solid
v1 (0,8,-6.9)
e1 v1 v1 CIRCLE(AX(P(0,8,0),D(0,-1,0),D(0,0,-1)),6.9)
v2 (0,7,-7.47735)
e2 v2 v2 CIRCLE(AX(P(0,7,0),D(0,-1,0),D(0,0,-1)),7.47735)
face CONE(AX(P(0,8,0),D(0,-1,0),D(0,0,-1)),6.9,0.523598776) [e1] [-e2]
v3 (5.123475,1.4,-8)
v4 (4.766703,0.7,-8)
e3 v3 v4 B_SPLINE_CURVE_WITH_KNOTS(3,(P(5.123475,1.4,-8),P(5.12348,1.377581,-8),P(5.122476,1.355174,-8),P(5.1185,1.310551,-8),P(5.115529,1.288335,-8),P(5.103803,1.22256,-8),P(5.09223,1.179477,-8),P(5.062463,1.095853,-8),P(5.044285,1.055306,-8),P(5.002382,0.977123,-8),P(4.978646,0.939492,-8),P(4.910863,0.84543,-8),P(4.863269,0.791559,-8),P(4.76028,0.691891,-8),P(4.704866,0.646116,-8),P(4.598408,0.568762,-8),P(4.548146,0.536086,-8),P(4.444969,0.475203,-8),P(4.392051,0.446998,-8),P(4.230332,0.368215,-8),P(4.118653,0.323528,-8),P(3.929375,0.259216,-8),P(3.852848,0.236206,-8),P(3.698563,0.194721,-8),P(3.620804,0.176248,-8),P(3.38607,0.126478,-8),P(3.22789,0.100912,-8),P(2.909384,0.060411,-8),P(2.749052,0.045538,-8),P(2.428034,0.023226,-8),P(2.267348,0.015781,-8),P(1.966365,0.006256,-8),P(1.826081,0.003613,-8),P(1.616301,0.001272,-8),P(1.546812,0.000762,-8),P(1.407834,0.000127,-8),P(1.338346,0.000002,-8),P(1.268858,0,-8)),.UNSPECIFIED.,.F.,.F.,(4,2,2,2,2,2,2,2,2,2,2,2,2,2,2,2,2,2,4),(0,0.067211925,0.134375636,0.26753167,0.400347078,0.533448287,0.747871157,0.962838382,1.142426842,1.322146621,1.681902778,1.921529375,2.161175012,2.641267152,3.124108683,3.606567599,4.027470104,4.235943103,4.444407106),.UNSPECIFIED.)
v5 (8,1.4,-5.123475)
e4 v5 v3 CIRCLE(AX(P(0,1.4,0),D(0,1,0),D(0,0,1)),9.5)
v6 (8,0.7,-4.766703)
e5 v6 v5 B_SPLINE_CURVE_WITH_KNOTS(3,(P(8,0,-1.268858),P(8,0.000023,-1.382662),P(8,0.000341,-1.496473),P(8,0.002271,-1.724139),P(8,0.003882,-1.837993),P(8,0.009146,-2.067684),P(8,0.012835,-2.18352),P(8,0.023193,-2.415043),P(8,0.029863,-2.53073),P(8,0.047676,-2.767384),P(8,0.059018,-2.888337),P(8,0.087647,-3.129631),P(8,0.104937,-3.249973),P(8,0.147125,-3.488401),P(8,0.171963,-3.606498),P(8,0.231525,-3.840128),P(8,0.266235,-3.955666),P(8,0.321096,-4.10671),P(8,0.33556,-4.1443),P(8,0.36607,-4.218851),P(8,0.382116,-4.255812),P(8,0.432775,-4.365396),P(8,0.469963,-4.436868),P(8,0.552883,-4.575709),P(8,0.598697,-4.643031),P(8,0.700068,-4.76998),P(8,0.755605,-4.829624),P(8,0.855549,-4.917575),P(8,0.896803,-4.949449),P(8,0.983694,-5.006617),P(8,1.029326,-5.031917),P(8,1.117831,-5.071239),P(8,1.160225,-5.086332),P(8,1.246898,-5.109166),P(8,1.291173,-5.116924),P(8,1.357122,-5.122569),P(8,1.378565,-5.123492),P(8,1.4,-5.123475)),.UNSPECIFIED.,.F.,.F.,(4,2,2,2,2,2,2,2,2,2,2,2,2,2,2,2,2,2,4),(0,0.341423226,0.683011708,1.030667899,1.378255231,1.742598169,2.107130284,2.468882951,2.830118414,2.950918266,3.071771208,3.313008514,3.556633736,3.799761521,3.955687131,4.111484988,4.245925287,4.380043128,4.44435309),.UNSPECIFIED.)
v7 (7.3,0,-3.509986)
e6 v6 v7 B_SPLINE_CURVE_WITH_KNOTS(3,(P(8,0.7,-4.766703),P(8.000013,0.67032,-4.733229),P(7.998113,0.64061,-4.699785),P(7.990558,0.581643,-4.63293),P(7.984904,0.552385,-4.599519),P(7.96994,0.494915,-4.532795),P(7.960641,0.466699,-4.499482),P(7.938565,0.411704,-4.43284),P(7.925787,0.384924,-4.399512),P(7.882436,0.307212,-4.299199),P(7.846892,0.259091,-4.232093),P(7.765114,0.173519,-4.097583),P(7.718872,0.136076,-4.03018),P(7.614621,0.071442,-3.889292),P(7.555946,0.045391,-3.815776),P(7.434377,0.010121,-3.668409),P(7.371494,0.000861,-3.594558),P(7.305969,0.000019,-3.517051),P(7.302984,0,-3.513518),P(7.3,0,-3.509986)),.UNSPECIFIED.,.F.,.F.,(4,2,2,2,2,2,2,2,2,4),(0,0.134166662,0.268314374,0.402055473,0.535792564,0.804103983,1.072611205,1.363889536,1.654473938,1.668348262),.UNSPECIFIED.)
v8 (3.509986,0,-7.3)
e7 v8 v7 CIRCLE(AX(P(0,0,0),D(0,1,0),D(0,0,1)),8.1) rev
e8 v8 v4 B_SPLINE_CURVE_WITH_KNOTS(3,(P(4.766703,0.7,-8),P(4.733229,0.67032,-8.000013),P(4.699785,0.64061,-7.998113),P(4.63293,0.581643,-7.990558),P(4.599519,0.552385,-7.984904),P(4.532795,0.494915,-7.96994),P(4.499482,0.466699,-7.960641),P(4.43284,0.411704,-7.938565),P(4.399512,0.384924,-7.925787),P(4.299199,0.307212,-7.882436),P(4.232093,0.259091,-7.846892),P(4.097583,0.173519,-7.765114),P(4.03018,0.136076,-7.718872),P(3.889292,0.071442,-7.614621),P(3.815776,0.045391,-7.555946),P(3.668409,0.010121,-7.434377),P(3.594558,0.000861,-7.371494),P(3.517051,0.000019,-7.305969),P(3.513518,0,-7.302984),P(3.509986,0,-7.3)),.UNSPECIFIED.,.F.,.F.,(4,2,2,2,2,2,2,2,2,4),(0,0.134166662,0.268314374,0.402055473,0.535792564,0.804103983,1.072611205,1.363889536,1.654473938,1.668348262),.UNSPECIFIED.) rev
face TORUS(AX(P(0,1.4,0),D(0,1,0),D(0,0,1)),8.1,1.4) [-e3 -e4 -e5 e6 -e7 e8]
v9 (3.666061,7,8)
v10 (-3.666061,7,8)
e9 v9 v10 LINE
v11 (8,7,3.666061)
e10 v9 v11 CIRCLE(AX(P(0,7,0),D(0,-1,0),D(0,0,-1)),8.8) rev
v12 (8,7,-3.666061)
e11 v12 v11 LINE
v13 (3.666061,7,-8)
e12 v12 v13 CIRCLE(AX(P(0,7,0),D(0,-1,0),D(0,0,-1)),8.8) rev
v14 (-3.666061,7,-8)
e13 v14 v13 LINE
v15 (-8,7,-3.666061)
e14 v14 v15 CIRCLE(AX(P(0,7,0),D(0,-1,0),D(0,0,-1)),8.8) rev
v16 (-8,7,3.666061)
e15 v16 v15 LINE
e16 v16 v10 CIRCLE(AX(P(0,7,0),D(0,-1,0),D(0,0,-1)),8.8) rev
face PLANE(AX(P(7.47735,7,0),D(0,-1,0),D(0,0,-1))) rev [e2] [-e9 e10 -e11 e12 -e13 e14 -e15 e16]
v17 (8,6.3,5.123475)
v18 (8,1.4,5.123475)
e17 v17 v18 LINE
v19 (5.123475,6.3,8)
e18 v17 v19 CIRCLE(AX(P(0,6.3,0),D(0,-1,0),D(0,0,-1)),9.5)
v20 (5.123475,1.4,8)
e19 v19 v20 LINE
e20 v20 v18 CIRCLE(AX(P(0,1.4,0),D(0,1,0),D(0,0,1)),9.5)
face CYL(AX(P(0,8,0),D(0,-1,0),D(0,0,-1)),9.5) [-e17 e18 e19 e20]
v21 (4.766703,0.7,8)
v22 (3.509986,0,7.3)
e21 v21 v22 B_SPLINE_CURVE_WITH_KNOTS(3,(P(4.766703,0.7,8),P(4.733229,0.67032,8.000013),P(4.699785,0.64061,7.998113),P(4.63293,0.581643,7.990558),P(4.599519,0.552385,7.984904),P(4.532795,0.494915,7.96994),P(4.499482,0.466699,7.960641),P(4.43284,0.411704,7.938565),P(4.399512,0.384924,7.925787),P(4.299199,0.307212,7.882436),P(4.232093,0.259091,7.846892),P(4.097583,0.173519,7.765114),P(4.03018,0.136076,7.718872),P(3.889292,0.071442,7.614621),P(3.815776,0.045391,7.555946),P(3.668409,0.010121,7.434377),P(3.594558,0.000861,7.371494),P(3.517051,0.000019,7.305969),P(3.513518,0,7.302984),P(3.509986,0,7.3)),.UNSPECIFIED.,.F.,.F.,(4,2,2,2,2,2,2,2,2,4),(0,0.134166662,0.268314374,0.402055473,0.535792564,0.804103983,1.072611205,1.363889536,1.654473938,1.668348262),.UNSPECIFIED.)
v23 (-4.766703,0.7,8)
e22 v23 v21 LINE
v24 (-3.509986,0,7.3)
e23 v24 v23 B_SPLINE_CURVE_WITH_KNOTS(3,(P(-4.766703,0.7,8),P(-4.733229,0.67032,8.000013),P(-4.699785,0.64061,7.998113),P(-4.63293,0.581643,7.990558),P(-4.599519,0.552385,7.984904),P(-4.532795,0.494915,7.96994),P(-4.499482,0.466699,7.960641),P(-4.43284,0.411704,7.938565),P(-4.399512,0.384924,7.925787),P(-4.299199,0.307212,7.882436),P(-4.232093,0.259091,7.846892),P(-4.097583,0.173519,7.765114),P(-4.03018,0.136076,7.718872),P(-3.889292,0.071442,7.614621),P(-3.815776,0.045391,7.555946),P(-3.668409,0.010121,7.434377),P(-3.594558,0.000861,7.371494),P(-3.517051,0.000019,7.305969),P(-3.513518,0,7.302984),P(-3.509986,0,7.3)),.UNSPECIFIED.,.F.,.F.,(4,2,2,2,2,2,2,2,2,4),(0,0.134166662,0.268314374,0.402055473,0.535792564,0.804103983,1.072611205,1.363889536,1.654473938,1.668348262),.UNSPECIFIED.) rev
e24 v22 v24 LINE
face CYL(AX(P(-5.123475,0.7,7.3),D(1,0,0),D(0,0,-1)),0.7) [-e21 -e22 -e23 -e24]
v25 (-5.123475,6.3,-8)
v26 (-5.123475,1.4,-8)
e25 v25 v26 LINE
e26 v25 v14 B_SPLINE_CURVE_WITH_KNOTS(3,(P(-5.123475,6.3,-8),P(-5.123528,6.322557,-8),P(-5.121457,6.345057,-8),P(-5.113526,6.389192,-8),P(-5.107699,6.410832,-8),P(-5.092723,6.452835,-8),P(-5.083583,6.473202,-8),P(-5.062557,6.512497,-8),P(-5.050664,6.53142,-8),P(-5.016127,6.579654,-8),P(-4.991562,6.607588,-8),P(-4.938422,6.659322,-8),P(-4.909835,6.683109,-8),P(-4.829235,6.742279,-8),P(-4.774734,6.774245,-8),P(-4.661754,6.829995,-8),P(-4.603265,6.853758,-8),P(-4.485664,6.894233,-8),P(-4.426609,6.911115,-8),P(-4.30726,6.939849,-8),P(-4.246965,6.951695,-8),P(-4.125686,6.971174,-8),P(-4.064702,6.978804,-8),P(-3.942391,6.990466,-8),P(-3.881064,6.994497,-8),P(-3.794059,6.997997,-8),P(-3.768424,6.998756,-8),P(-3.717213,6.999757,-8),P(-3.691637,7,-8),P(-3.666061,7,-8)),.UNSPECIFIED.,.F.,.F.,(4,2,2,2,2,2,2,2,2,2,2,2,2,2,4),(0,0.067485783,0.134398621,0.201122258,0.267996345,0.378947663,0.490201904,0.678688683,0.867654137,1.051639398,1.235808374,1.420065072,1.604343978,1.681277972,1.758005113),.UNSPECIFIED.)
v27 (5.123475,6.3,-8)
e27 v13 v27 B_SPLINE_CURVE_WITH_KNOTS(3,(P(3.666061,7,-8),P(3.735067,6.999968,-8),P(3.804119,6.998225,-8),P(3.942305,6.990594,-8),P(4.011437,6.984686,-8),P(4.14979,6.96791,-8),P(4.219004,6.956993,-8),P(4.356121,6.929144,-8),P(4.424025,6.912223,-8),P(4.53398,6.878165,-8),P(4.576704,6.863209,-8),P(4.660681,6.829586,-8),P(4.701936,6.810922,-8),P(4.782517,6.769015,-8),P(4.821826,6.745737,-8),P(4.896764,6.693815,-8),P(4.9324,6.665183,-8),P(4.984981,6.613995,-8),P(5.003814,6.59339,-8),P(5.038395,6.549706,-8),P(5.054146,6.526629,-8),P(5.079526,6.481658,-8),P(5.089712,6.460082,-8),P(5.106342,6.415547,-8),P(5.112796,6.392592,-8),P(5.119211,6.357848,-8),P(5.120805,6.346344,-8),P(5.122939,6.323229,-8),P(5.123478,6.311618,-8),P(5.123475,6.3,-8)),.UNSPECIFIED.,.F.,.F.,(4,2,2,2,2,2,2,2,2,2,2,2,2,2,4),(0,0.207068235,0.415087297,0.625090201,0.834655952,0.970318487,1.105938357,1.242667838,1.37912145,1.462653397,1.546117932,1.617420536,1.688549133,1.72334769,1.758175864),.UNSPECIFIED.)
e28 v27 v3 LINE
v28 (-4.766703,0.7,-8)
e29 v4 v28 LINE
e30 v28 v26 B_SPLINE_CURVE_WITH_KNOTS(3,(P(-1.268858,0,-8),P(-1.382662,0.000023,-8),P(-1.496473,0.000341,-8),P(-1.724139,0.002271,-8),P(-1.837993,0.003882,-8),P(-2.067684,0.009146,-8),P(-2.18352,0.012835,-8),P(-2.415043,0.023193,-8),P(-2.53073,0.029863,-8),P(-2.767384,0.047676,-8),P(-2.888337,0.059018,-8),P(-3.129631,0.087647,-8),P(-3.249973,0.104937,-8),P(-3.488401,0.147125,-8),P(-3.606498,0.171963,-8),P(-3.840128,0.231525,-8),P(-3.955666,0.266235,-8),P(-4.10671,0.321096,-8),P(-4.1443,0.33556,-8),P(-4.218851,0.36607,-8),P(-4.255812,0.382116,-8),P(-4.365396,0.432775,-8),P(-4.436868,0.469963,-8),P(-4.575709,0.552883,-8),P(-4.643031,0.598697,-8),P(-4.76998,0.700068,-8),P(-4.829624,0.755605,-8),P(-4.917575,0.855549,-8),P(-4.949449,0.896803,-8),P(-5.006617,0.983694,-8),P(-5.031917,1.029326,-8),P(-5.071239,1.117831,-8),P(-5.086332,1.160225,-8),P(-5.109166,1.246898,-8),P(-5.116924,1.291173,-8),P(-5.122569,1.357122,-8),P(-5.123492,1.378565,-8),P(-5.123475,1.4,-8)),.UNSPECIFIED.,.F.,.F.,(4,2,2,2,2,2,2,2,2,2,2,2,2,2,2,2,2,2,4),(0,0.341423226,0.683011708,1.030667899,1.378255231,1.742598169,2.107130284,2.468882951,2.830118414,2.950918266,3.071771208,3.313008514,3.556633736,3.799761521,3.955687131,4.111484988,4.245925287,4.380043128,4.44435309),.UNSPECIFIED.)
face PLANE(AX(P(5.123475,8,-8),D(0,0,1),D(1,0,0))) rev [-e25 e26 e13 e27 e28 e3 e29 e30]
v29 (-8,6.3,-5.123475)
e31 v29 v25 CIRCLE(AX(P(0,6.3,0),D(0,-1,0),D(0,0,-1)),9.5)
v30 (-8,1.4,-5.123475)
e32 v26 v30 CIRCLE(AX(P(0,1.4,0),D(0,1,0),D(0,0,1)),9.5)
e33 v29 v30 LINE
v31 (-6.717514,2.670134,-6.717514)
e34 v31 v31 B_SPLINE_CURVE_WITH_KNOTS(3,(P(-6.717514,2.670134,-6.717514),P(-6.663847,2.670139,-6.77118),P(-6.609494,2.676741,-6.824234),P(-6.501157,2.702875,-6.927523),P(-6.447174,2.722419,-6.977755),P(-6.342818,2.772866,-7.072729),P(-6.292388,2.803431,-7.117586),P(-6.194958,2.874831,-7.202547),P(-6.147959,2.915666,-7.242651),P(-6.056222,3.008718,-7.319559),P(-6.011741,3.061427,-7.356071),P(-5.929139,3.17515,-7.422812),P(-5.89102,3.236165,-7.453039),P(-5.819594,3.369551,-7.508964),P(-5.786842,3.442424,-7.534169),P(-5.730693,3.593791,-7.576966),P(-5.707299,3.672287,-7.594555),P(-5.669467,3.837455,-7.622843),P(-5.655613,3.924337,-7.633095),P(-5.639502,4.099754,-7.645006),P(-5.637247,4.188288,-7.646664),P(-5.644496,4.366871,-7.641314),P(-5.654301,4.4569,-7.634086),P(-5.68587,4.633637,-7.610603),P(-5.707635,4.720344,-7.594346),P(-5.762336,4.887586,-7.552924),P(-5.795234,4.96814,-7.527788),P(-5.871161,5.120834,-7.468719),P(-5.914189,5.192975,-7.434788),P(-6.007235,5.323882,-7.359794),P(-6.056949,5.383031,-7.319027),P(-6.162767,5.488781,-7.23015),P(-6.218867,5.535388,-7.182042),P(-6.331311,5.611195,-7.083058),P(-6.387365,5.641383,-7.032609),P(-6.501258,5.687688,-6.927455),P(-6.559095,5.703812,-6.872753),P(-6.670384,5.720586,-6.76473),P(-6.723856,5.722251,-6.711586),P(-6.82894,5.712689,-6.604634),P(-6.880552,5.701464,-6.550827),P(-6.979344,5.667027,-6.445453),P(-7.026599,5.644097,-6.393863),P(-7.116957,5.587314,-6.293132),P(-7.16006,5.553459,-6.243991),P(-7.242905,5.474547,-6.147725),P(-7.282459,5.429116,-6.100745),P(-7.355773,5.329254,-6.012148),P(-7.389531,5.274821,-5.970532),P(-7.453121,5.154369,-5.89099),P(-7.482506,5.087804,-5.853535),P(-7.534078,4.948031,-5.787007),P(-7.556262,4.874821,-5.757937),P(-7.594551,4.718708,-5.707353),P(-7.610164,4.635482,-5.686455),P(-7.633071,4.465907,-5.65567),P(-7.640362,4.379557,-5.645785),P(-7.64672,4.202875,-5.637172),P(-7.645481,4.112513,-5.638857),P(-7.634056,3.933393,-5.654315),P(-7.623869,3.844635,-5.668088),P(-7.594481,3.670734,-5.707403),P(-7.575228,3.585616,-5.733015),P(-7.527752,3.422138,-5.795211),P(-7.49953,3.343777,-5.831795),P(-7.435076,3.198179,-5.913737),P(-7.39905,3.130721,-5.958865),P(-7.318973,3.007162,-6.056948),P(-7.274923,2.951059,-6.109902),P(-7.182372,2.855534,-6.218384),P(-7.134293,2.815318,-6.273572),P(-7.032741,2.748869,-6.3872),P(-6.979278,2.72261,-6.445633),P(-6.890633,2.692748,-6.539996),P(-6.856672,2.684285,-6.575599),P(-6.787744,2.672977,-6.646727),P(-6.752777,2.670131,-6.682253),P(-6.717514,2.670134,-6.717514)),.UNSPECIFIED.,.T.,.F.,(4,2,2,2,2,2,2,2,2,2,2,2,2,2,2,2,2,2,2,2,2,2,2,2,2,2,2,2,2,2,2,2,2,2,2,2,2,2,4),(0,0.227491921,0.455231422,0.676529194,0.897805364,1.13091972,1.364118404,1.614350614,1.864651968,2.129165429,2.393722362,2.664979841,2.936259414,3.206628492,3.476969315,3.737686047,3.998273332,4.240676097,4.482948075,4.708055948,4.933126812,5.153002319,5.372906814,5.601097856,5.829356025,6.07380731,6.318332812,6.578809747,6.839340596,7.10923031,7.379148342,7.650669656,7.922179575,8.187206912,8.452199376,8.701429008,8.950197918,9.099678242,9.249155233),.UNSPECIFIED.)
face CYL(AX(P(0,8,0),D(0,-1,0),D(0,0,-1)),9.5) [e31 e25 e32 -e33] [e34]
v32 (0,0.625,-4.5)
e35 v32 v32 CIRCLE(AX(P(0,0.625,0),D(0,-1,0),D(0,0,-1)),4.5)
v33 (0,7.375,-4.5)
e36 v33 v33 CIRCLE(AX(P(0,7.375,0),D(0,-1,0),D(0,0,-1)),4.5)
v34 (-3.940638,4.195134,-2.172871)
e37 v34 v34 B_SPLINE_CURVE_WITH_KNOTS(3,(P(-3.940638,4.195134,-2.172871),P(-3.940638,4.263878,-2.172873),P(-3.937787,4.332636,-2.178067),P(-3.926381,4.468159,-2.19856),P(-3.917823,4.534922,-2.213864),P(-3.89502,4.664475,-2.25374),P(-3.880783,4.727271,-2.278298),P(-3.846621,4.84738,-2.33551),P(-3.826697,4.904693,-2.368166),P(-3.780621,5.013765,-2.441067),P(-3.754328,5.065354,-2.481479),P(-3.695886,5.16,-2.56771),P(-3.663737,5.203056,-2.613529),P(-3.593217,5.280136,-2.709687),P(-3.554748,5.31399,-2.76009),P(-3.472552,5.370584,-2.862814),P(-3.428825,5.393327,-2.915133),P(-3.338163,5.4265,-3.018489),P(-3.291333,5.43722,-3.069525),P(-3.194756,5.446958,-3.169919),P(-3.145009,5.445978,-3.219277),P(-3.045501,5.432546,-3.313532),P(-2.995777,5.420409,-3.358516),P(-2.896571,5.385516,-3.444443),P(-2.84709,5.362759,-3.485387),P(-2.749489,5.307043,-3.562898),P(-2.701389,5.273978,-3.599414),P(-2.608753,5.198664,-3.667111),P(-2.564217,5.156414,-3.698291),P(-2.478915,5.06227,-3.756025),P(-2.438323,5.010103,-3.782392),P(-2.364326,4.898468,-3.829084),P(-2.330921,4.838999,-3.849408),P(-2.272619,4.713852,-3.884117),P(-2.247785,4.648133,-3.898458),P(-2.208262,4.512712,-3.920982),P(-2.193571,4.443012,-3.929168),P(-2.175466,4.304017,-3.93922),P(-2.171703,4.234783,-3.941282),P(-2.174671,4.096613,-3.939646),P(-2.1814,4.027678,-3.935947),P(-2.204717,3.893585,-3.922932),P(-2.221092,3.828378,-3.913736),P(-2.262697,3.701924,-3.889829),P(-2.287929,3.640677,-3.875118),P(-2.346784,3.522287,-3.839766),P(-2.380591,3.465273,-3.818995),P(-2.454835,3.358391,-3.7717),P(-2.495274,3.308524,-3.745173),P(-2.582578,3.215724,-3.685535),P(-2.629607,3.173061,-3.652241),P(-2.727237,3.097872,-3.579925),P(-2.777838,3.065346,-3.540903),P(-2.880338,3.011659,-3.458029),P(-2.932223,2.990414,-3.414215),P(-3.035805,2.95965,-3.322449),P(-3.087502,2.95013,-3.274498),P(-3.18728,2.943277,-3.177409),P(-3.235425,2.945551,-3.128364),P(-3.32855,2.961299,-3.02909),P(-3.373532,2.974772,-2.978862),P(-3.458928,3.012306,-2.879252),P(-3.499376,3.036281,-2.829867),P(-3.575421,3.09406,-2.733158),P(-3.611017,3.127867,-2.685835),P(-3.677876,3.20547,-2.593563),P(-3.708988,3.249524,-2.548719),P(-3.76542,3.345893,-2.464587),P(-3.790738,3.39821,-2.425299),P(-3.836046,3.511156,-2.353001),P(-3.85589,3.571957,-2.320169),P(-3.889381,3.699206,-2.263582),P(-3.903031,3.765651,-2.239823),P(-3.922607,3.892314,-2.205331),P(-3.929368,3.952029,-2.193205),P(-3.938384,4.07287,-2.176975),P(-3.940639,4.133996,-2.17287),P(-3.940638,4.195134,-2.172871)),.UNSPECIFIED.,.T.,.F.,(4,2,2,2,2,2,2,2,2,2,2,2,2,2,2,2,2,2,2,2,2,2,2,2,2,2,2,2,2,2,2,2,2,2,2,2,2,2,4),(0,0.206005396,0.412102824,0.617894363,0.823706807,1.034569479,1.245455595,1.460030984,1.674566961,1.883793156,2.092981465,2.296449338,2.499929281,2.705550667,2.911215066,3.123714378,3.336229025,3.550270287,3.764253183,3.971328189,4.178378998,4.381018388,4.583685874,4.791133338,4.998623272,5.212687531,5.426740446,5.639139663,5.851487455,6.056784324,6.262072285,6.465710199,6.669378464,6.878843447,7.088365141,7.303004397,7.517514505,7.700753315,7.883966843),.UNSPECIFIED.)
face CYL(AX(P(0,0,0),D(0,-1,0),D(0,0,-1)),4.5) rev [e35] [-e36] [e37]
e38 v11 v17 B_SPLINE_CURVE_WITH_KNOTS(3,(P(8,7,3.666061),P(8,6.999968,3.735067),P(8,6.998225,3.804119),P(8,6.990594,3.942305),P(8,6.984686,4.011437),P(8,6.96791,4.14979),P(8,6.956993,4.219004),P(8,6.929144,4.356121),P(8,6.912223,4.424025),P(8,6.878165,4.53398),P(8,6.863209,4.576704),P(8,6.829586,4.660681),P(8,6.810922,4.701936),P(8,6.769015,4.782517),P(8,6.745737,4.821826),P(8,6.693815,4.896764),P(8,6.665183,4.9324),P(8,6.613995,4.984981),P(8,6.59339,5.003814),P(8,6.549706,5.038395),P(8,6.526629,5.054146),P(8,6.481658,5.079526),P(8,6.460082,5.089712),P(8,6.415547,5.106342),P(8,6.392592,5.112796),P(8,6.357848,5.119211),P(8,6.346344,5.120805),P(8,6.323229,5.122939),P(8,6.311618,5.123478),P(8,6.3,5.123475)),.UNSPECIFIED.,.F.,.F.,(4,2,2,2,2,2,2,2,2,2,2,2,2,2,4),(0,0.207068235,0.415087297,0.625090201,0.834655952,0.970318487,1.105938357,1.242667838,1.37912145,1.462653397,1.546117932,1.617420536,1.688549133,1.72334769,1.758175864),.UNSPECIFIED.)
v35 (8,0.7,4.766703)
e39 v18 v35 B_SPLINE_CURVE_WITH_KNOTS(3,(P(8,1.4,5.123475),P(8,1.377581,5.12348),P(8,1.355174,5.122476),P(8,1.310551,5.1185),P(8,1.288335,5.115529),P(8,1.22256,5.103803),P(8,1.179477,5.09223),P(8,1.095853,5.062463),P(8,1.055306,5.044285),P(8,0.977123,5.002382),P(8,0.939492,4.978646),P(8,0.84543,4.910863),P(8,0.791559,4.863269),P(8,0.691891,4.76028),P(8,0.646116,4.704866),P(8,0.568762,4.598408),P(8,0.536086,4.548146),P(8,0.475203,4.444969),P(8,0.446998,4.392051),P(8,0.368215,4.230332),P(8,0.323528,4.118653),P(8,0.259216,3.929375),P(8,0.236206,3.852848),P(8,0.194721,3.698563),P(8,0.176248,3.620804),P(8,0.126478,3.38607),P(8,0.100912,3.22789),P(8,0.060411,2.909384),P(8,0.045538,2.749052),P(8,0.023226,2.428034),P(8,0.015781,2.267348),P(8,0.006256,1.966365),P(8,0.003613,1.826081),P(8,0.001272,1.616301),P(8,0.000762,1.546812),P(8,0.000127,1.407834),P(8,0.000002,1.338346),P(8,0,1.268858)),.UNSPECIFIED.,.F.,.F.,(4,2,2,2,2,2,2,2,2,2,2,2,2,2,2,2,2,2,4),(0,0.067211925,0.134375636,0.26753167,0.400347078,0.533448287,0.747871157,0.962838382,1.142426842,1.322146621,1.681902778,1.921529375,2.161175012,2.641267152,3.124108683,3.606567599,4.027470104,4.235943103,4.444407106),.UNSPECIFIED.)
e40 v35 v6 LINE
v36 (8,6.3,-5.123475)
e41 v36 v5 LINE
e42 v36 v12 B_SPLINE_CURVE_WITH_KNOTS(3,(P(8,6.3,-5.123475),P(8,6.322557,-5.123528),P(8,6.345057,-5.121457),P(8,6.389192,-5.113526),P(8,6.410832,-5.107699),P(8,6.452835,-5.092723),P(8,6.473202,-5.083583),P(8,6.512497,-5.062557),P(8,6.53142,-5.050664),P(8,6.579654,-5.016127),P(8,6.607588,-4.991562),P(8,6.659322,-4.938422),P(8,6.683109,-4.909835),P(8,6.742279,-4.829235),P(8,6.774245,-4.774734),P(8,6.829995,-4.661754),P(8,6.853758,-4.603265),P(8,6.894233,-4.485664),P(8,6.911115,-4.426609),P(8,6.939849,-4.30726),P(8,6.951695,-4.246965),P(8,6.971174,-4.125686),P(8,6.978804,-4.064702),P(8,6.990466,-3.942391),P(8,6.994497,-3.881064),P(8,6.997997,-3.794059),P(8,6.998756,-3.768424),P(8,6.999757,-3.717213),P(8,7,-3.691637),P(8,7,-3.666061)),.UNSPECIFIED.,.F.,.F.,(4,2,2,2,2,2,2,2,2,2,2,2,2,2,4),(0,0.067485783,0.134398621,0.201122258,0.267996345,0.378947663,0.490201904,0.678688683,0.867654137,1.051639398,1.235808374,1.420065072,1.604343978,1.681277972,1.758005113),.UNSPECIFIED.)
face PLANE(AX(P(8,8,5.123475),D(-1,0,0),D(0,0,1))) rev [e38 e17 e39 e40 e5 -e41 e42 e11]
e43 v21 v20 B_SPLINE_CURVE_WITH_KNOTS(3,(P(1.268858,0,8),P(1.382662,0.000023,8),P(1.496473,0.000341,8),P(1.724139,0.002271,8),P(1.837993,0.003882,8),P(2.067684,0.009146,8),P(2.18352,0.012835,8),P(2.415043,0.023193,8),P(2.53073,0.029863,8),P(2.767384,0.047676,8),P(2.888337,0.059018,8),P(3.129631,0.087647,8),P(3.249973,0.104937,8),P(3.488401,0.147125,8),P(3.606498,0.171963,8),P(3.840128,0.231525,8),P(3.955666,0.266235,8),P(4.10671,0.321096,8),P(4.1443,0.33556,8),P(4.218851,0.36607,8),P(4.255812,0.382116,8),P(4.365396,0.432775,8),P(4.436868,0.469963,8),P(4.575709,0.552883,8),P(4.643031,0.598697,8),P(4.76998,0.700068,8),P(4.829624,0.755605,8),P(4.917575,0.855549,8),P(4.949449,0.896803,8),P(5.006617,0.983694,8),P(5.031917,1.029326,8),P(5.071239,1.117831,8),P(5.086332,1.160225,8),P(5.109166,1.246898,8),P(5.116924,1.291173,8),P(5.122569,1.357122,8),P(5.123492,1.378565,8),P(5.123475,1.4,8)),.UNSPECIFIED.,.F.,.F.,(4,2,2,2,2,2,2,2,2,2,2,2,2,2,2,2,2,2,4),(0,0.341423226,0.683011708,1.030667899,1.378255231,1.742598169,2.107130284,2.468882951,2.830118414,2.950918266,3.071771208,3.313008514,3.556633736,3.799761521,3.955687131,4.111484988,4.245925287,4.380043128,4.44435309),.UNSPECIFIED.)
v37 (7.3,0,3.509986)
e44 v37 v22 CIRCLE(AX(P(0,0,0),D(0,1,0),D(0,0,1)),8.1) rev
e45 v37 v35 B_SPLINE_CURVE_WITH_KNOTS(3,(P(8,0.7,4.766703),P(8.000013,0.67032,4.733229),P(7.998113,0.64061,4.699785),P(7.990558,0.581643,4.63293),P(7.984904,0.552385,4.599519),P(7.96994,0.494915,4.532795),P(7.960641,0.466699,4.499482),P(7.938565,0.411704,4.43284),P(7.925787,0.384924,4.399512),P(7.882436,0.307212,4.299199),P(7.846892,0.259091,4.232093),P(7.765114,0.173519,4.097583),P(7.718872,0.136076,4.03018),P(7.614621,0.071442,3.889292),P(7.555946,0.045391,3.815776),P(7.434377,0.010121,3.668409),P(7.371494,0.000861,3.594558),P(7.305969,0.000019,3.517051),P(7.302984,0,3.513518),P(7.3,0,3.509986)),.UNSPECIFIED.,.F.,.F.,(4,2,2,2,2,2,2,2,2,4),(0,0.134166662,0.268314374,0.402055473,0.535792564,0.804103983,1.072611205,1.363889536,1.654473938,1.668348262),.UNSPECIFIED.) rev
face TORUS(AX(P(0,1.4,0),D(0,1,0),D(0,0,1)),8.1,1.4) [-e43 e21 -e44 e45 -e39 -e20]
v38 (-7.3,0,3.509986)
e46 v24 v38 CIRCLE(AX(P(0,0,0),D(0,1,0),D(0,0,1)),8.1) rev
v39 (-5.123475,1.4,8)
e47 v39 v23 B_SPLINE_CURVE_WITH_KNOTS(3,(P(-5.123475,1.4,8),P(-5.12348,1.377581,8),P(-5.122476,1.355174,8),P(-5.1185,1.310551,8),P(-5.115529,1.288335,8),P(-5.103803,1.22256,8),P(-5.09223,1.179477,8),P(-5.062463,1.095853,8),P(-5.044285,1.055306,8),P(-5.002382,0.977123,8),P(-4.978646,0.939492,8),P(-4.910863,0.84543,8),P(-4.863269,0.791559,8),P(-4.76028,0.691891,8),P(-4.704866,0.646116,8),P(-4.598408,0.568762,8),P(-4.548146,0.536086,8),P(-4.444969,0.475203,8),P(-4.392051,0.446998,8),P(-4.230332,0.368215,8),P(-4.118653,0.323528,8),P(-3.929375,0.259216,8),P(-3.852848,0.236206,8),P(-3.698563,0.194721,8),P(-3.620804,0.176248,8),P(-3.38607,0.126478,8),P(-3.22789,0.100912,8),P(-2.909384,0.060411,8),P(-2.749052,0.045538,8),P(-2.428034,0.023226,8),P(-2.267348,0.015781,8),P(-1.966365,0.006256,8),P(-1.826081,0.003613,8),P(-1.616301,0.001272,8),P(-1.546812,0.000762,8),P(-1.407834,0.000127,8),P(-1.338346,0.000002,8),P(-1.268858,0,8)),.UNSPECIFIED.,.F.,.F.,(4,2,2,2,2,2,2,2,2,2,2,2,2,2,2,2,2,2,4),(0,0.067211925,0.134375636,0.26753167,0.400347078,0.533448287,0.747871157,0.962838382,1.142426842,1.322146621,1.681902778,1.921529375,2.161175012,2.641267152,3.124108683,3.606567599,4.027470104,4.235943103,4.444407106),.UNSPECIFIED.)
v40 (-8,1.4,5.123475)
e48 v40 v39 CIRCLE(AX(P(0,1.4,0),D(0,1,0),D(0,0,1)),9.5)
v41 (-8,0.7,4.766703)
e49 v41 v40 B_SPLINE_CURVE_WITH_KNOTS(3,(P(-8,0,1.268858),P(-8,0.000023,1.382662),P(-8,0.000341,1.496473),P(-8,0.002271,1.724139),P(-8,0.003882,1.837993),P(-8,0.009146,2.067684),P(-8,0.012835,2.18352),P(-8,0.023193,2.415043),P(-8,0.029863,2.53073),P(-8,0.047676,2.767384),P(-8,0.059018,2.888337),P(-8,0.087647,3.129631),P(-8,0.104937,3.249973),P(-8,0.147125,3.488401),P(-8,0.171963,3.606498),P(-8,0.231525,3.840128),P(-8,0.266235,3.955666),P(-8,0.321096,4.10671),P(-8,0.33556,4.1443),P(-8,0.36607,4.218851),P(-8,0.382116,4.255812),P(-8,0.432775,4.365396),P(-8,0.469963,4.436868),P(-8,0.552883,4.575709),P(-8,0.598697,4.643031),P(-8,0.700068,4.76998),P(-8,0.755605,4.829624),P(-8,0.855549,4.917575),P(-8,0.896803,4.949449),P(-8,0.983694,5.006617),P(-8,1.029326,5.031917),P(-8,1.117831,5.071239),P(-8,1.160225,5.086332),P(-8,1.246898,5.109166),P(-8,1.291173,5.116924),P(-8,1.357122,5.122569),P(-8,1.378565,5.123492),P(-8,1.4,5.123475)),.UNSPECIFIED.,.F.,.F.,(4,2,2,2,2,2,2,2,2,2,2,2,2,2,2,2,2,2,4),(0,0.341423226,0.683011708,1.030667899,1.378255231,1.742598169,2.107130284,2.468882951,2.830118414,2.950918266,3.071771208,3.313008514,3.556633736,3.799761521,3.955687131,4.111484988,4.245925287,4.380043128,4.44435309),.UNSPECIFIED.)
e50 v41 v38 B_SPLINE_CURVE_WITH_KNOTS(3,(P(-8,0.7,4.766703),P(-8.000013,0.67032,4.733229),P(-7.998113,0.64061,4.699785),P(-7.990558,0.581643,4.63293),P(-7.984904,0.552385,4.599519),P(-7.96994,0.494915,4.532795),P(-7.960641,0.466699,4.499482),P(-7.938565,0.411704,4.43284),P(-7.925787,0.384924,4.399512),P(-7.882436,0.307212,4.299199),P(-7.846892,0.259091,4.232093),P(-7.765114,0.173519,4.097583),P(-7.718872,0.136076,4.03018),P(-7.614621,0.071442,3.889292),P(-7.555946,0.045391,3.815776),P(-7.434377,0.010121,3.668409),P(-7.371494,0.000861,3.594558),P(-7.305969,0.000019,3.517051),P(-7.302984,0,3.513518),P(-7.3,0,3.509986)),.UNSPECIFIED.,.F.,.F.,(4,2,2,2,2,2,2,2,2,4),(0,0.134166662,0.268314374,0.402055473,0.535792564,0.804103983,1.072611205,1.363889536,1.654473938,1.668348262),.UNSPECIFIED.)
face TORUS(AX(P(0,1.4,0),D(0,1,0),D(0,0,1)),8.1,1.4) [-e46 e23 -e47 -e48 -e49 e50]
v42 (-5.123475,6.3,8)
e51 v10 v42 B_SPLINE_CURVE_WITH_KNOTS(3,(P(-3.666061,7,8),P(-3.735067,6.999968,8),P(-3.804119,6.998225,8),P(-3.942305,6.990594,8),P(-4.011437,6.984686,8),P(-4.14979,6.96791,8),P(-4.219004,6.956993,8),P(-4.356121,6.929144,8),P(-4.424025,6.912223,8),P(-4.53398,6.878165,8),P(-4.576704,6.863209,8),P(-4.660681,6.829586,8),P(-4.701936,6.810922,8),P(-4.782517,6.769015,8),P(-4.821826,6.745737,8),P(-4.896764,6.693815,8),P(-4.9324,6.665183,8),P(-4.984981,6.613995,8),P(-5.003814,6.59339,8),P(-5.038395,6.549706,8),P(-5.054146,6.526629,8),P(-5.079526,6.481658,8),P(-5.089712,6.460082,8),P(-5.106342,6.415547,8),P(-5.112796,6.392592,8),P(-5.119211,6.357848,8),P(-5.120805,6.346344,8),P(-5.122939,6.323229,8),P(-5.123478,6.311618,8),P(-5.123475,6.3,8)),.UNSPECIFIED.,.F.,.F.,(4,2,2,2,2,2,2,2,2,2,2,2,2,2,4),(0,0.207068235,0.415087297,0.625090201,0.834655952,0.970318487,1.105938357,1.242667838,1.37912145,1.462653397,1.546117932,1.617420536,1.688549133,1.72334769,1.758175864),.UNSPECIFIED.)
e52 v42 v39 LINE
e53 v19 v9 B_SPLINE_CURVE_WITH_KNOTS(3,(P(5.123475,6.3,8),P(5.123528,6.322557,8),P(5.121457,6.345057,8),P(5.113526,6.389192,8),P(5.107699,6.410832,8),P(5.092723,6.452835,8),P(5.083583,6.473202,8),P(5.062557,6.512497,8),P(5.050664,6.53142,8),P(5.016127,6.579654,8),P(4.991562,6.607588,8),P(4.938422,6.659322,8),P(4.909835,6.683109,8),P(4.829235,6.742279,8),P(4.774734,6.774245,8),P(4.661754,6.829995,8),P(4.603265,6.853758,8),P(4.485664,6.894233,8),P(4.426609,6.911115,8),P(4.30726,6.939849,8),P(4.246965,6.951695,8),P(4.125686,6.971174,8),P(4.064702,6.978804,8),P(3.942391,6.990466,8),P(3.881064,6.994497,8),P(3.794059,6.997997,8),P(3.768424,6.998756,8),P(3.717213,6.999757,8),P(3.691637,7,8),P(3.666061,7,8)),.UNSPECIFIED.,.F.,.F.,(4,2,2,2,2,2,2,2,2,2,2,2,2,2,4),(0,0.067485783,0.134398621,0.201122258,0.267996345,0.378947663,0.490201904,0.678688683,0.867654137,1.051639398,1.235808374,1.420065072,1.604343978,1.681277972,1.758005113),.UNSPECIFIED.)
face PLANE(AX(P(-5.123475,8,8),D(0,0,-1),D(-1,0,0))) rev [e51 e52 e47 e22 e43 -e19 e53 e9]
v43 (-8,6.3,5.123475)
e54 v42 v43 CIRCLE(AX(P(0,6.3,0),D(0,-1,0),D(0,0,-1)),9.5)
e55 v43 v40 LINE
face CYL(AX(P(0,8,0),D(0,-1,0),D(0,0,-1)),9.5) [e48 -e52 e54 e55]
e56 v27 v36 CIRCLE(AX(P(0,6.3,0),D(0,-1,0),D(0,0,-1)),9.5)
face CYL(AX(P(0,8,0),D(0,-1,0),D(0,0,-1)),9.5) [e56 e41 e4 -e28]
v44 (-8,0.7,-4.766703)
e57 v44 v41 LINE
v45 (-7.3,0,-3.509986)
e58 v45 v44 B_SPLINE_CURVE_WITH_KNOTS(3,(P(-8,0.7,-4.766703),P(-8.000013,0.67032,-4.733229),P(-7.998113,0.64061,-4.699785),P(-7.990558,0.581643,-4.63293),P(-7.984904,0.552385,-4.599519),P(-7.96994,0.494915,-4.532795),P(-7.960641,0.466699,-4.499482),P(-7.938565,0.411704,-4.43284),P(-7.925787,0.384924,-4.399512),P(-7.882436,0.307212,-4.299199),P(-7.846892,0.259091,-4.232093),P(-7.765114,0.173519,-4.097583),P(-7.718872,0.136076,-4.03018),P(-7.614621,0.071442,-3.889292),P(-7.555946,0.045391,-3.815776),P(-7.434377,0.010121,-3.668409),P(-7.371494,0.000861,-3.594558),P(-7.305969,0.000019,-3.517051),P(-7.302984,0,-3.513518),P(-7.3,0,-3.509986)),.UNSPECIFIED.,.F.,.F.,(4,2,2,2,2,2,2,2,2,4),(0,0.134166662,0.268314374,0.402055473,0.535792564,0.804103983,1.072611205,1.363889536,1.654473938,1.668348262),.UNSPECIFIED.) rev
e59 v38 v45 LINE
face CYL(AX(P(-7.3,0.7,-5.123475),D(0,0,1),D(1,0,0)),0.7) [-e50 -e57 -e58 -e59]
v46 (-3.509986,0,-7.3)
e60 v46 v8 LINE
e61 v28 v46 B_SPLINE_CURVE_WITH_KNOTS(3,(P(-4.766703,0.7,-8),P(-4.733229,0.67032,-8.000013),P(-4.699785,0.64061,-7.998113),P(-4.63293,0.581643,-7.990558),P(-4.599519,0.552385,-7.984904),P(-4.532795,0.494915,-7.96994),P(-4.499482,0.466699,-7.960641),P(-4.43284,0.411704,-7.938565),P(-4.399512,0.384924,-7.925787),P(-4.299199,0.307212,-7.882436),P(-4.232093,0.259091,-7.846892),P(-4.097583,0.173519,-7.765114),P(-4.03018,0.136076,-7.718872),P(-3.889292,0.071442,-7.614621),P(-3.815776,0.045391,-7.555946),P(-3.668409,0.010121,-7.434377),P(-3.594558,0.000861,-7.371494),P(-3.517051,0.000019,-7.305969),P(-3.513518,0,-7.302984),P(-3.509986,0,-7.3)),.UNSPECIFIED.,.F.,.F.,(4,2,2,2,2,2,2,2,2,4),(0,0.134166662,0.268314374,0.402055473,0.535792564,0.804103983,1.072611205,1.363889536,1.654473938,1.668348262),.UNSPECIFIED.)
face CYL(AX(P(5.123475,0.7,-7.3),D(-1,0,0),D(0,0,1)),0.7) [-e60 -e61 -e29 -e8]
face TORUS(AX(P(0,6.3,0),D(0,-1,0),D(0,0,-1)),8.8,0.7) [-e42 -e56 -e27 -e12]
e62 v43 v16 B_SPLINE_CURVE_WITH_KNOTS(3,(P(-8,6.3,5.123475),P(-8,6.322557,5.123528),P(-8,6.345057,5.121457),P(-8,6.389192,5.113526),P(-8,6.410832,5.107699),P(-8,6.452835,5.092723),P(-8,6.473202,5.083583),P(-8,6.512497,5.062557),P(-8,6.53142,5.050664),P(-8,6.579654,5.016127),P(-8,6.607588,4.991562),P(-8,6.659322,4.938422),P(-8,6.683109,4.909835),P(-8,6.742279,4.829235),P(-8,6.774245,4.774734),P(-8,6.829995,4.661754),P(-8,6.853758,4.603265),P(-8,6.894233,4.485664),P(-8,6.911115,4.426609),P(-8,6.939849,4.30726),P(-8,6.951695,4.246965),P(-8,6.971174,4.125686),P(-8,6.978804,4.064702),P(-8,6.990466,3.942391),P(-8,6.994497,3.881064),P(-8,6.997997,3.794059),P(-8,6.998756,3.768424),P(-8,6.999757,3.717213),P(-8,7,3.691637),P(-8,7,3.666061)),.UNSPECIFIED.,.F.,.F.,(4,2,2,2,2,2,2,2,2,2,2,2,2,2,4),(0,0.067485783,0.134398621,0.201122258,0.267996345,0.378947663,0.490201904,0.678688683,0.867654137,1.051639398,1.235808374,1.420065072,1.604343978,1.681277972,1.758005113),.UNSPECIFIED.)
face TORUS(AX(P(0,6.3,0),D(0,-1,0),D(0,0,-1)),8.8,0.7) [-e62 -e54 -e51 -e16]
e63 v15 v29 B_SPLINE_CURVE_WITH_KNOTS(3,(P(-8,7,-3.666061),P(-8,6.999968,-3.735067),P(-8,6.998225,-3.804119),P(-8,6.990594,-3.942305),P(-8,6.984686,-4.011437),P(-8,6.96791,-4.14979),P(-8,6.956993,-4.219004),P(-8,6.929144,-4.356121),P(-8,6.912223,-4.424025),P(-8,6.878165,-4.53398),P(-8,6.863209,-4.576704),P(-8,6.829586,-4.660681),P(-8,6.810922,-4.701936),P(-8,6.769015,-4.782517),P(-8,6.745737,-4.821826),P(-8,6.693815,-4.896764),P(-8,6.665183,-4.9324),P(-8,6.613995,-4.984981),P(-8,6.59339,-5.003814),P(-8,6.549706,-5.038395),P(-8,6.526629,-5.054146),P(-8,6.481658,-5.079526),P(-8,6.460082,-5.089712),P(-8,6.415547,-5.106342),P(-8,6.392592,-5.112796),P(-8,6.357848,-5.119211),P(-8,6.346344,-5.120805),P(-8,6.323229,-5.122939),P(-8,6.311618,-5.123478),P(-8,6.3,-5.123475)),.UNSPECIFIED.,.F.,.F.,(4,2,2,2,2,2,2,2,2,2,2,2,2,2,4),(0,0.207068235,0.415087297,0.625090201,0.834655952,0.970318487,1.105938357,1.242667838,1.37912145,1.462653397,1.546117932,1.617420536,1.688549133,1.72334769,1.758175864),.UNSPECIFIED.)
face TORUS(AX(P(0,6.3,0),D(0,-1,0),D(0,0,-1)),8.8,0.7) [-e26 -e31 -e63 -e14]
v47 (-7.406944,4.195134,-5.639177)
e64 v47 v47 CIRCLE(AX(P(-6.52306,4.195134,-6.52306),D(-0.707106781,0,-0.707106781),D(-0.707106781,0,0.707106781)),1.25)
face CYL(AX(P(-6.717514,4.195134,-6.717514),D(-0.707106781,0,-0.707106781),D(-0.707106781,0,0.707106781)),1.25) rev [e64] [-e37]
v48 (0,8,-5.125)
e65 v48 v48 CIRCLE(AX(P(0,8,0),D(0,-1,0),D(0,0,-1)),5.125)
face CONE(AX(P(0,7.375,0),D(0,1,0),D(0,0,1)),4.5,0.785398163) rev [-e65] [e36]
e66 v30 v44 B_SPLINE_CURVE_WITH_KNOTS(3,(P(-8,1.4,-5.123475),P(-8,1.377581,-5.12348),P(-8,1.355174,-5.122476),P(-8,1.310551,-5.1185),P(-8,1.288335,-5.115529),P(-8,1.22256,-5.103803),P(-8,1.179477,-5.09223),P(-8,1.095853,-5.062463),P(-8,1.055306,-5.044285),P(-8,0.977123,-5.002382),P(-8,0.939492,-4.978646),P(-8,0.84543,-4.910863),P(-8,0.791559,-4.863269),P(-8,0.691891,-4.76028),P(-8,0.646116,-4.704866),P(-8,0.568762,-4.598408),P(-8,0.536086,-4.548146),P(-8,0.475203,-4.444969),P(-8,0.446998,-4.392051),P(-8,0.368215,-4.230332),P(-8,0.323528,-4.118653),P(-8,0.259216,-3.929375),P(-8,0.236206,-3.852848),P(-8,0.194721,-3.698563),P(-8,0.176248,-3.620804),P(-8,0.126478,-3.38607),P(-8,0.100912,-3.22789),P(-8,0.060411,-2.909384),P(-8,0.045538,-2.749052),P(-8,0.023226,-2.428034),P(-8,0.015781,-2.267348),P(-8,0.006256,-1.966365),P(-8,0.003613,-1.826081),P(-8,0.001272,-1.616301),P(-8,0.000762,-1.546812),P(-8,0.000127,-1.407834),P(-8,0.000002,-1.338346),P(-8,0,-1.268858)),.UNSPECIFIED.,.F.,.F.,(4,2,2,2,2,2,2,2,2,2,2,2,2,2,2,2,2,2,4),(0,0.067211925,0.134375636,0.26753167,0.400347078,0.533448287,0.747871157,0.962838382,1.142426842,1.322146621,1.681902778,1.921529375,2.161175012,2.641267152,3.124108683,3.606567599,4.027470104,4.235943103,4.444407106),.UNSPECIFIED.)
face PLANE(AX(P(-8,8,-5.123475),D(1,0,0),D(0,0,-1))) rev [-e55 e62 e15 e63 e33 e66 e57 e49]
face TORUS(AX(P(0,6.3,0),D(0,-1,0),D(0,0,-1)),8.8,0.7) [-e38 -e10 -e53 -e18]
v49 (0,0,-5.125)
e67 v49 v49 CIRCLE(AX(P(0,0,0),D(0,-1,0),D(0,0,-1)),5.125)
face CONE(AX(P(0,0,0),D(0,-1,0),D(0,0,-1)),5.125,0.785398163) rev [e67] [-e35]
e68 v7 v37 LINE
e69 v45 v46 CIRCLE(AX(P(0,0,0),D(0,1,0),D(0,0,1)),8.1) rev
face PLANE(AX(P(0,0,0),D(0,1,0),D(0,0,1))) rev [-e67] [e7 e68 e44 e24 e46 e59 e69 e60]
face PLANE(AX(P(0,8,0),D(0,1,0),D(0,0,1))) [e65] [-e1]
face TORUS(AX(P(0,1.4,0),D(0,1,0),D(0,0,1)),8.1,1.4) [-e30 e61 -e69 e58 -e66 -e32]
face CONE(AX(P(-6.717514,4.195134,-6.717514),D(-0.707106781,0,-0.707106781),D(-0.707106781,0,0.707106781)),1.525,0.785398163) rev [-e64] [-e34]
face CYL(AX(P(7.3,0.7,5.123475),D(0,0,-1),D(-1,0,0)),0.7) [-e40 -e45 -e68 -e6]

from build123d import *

# Parameters (mm, degrees)
BOSS_EXTRUDE1_DEPTH = 8
FILLET2_R           = 1.4
FILLET3_R           = 0.7


with BuildPart() as part:
    # Sketch1 → Boss-Extrude1 (new body)
    with BuildSketch(Plane(origin=(0, 0, 0), x_dir=(1, 0, 0), z_dir=(0, 1, 0))):
        with BuildLine():
            Line((-8, 5.123475383), (-8, -5.123475383))
            ThreePointArc((-8, -5.123475383), (-6.717514421, -6.717514421), (-5.123475383, -8))
            Line((-5.123475383, -8), (5.123475383, -8))
            ThreePointArc((5.123475383, -8), (6.717514421, -6.717514421), (8, -5.123475383))
            Line((8, -5.123475383), (8, 5.123475383))
            ThreePointArc((8, 5.123475383), (6.717514421, 6.717514421), (5.123475383, 8))
            Line((5.123475383, 8), (-5.123475383, 8))
            ThreePointArc((-5.123475383, 8), (-6.717514421, 6.717514421), (-8, 5.123475383))
        make_face()
    extrude(amount=BOSS_EXTRUDE1_DEPTH)

    # Sketch2 → Cut-Revolve1 (revolve, cut)
    with BuildSketch(Plane.XY, mode=Mode.PRIVATE) as cut_revolve1_sk:
        Polygon((6.9, 8), (7.477350269, 7), (9.756701135, 7), (9.756701135, 8), align=None)
    revolve(cut_revolve1_sk.sketch.rotate(Axis((0, 0, 0), (0, 1, 0)), 90), axis=Axis((0, 0, 0), (0, 1, 0)), mode=Mode.SUBTRACT)

    # Sketch5 → M10x1.0 Tapped Hole1 (revolve, cut)
    with BuildSketch(Plane(origin=(0, 0, 0), x_dir=(0, 0, -1), z_dir=(1, 0, 0))):
        Polygon((0, 0), (0, 8), (5.125, 8), (4.5, 7.375), (4.5, 0.625), (5.125, 0), align=None)
    revolve(axis=Axis((0, -6.35, 0), (0, 1, 0)), mode=Mode.SUBTRACT)

    # M3 Tapped Hole1: read off the stored shape, not the designer's step
    # M3 Tapped Hole1 outline → M3 Tapped Hole1 (revolve, cut)
    with BuildSketch(Plane(origin=(0, 4.19513424, 0), x_dir=(0.7071067811865471, 0, -0.707106781186548), z_dir=(0, -1, 0))):
        Polygon((0, -9.500060785), (1.525060785, -9.500060785), (1.25, -9.225), (1.25, -4.322803032), (0, -4.322803032), align=None)
    revolve(axis=Axis((0, 4.19513424, 0), (0.707106781186548, 0, 0.7071067811865471)), mode=Mode.SUBTRACT)

    # Fillet2
    fillet2_edges = [part.edges().sort_by_distance(p)[0] for p in [
        (6.717514421, 0, 6.717514421),
        (-6.717514421, 0, 6.717514421),
        (-6.717514421, 0, -6.717514421),
        (6.717514421, 0, -6.717514421),
    ]]
    fillet(fillet2_edges, radius=FILLET2_R)

    # Fillet3
    # the kernel refuses this fillet: 0.7 mm, written as the material it takes off along each edge
    with BuildSketch(Plane(origin=(0, 7, 0), x_dir=(-0.3759346527851674, 0, 0.9266461767229688), z_dir=(0.9266461767229688, 0, 0.3759346527851674))) as fillet3_piece_1:
        with BuildLine():
            CenterArc((9.5 - FILLET3_R, FILLET3_R), FILLET3_R, 270, 90)
            Line((9.5, FILLET3_R), (9.5, 0))
            Line((9.5, 0), (9.5 - FILLET3_R, 0))
        make_face()
    revolve(axis=Axis((0, 7, 0), (0, -1, 0)), revolution_arc=45.835816267, mode=Mode.SUBTRACT)
    with BuildSketch(Plane(origin=(0, 7, 0), x_dir=(-0.9266461767229688, 0, -0.3759346527851675), z_dir=(-0.3759346527851675, 0, 0.9266461767229688))) as fillet3_piece_2:
        with BuildLine():
            CenterArc((9.5 - FILLET3_R, FILLET3_R), FILLET3_R, 270, 90)
            Line((9.5 - FILLET3_R, 0), (9.5, 0))
            Line((9.5, 0), (9.5, FILLET3_R))
        make_face()
    revolve(axis=Axis((0, 7, 0), (0, -1, 0)), revolution_arc=45.835816267, mode=Mode.SUBTRACT)
    with BuildSketch(Plane(origin=(0, 7, 0), x_dir=(0.3759346527851687, 0, -0.9266461767229682), z_dir=(-0.9266461767229682, 0, -0.3759346527851687))) as fillet3_piece_3:
        with BuildLine():
            CenterArc((9.5 - FILLET3_R, FILLET3_R), FILLET3_R, 270, 90)
            Line((9.5 - FILLET3_R, 0), (9.5, 0))
            Line((9.5, 0), (9.5, FILLET3_R))
        make_face()
    revolve(axis=Axis((0, 7, 0), (0, -1, 0)), revolution_arc=45.835816267, mode=Mode.SUBTRACT)
    with BuildSketch(Plane(origin=(0, 7, 0), x_dir=(0.9266461767229706, 0, 0.3759346527851629), z_dir=(0.3759346527851629, 0, -0.9266461767229706))) as fillet3_piece_4:
        with BuildLine():
            CenterArc((9.5 - FILLET3_R, FILLET3_R), FILLET3_R, 270, 90)
            Line((9.5, FILLET3_R), (9.5, 0))
            Line((9.5, 0), (9.5 - FILLET3_R, 0))
        make_face()
    revolve(axis=Axis((0, 7, 0), (0, -1, 0)), revolution_arc=45.835816267, mode=Mode.SUBTRACT)
    with BuildSketch(Plane(origin=(8, 0, 6.518857754), x_dir=(-1, 0, 0), z_dir=(0, 0, -1)), Plane(origin=(-6.518857754, 0, 8), x_dir=(0, 0, -1), z_dir=(1, 0, 0)), Plane(origin=(-8, 0, -6.518857754), x_dir=(1, 0, 0), z_dir=(0, 0, 1))) as fillet3_piece_5:
        with BuildLine():
            CenterArc((FILLET3_R, FILLET3_R), FILLET3_R, 180, 90)
            Line((0, FILLET3_R), (0, 0))
            Line((0, 0), (FILLET3_R, 0))
        make_face()
    extrude(amount=13.037715508, mode=Mode.SUBTRACT)
    with BuildSketch(Plane(origin=(6.518857754, 0, -8), x_dir=(0, 1, 0), z_dir=(-1, 0, 0))) as fillet3_piece_6:
        with BuildLine():
            CenterArc((FILLET3_R, -FILLET3_R), FILLET3_R, 90, 90)
            Line((0, -FILLET3_R), (0, 0))
            Line((0, 0), (FILLET3_R, 0))
        make_face()
    extrude(amount=13.037715508, mode=Mode.SUBTRACT)


solid = part.part
